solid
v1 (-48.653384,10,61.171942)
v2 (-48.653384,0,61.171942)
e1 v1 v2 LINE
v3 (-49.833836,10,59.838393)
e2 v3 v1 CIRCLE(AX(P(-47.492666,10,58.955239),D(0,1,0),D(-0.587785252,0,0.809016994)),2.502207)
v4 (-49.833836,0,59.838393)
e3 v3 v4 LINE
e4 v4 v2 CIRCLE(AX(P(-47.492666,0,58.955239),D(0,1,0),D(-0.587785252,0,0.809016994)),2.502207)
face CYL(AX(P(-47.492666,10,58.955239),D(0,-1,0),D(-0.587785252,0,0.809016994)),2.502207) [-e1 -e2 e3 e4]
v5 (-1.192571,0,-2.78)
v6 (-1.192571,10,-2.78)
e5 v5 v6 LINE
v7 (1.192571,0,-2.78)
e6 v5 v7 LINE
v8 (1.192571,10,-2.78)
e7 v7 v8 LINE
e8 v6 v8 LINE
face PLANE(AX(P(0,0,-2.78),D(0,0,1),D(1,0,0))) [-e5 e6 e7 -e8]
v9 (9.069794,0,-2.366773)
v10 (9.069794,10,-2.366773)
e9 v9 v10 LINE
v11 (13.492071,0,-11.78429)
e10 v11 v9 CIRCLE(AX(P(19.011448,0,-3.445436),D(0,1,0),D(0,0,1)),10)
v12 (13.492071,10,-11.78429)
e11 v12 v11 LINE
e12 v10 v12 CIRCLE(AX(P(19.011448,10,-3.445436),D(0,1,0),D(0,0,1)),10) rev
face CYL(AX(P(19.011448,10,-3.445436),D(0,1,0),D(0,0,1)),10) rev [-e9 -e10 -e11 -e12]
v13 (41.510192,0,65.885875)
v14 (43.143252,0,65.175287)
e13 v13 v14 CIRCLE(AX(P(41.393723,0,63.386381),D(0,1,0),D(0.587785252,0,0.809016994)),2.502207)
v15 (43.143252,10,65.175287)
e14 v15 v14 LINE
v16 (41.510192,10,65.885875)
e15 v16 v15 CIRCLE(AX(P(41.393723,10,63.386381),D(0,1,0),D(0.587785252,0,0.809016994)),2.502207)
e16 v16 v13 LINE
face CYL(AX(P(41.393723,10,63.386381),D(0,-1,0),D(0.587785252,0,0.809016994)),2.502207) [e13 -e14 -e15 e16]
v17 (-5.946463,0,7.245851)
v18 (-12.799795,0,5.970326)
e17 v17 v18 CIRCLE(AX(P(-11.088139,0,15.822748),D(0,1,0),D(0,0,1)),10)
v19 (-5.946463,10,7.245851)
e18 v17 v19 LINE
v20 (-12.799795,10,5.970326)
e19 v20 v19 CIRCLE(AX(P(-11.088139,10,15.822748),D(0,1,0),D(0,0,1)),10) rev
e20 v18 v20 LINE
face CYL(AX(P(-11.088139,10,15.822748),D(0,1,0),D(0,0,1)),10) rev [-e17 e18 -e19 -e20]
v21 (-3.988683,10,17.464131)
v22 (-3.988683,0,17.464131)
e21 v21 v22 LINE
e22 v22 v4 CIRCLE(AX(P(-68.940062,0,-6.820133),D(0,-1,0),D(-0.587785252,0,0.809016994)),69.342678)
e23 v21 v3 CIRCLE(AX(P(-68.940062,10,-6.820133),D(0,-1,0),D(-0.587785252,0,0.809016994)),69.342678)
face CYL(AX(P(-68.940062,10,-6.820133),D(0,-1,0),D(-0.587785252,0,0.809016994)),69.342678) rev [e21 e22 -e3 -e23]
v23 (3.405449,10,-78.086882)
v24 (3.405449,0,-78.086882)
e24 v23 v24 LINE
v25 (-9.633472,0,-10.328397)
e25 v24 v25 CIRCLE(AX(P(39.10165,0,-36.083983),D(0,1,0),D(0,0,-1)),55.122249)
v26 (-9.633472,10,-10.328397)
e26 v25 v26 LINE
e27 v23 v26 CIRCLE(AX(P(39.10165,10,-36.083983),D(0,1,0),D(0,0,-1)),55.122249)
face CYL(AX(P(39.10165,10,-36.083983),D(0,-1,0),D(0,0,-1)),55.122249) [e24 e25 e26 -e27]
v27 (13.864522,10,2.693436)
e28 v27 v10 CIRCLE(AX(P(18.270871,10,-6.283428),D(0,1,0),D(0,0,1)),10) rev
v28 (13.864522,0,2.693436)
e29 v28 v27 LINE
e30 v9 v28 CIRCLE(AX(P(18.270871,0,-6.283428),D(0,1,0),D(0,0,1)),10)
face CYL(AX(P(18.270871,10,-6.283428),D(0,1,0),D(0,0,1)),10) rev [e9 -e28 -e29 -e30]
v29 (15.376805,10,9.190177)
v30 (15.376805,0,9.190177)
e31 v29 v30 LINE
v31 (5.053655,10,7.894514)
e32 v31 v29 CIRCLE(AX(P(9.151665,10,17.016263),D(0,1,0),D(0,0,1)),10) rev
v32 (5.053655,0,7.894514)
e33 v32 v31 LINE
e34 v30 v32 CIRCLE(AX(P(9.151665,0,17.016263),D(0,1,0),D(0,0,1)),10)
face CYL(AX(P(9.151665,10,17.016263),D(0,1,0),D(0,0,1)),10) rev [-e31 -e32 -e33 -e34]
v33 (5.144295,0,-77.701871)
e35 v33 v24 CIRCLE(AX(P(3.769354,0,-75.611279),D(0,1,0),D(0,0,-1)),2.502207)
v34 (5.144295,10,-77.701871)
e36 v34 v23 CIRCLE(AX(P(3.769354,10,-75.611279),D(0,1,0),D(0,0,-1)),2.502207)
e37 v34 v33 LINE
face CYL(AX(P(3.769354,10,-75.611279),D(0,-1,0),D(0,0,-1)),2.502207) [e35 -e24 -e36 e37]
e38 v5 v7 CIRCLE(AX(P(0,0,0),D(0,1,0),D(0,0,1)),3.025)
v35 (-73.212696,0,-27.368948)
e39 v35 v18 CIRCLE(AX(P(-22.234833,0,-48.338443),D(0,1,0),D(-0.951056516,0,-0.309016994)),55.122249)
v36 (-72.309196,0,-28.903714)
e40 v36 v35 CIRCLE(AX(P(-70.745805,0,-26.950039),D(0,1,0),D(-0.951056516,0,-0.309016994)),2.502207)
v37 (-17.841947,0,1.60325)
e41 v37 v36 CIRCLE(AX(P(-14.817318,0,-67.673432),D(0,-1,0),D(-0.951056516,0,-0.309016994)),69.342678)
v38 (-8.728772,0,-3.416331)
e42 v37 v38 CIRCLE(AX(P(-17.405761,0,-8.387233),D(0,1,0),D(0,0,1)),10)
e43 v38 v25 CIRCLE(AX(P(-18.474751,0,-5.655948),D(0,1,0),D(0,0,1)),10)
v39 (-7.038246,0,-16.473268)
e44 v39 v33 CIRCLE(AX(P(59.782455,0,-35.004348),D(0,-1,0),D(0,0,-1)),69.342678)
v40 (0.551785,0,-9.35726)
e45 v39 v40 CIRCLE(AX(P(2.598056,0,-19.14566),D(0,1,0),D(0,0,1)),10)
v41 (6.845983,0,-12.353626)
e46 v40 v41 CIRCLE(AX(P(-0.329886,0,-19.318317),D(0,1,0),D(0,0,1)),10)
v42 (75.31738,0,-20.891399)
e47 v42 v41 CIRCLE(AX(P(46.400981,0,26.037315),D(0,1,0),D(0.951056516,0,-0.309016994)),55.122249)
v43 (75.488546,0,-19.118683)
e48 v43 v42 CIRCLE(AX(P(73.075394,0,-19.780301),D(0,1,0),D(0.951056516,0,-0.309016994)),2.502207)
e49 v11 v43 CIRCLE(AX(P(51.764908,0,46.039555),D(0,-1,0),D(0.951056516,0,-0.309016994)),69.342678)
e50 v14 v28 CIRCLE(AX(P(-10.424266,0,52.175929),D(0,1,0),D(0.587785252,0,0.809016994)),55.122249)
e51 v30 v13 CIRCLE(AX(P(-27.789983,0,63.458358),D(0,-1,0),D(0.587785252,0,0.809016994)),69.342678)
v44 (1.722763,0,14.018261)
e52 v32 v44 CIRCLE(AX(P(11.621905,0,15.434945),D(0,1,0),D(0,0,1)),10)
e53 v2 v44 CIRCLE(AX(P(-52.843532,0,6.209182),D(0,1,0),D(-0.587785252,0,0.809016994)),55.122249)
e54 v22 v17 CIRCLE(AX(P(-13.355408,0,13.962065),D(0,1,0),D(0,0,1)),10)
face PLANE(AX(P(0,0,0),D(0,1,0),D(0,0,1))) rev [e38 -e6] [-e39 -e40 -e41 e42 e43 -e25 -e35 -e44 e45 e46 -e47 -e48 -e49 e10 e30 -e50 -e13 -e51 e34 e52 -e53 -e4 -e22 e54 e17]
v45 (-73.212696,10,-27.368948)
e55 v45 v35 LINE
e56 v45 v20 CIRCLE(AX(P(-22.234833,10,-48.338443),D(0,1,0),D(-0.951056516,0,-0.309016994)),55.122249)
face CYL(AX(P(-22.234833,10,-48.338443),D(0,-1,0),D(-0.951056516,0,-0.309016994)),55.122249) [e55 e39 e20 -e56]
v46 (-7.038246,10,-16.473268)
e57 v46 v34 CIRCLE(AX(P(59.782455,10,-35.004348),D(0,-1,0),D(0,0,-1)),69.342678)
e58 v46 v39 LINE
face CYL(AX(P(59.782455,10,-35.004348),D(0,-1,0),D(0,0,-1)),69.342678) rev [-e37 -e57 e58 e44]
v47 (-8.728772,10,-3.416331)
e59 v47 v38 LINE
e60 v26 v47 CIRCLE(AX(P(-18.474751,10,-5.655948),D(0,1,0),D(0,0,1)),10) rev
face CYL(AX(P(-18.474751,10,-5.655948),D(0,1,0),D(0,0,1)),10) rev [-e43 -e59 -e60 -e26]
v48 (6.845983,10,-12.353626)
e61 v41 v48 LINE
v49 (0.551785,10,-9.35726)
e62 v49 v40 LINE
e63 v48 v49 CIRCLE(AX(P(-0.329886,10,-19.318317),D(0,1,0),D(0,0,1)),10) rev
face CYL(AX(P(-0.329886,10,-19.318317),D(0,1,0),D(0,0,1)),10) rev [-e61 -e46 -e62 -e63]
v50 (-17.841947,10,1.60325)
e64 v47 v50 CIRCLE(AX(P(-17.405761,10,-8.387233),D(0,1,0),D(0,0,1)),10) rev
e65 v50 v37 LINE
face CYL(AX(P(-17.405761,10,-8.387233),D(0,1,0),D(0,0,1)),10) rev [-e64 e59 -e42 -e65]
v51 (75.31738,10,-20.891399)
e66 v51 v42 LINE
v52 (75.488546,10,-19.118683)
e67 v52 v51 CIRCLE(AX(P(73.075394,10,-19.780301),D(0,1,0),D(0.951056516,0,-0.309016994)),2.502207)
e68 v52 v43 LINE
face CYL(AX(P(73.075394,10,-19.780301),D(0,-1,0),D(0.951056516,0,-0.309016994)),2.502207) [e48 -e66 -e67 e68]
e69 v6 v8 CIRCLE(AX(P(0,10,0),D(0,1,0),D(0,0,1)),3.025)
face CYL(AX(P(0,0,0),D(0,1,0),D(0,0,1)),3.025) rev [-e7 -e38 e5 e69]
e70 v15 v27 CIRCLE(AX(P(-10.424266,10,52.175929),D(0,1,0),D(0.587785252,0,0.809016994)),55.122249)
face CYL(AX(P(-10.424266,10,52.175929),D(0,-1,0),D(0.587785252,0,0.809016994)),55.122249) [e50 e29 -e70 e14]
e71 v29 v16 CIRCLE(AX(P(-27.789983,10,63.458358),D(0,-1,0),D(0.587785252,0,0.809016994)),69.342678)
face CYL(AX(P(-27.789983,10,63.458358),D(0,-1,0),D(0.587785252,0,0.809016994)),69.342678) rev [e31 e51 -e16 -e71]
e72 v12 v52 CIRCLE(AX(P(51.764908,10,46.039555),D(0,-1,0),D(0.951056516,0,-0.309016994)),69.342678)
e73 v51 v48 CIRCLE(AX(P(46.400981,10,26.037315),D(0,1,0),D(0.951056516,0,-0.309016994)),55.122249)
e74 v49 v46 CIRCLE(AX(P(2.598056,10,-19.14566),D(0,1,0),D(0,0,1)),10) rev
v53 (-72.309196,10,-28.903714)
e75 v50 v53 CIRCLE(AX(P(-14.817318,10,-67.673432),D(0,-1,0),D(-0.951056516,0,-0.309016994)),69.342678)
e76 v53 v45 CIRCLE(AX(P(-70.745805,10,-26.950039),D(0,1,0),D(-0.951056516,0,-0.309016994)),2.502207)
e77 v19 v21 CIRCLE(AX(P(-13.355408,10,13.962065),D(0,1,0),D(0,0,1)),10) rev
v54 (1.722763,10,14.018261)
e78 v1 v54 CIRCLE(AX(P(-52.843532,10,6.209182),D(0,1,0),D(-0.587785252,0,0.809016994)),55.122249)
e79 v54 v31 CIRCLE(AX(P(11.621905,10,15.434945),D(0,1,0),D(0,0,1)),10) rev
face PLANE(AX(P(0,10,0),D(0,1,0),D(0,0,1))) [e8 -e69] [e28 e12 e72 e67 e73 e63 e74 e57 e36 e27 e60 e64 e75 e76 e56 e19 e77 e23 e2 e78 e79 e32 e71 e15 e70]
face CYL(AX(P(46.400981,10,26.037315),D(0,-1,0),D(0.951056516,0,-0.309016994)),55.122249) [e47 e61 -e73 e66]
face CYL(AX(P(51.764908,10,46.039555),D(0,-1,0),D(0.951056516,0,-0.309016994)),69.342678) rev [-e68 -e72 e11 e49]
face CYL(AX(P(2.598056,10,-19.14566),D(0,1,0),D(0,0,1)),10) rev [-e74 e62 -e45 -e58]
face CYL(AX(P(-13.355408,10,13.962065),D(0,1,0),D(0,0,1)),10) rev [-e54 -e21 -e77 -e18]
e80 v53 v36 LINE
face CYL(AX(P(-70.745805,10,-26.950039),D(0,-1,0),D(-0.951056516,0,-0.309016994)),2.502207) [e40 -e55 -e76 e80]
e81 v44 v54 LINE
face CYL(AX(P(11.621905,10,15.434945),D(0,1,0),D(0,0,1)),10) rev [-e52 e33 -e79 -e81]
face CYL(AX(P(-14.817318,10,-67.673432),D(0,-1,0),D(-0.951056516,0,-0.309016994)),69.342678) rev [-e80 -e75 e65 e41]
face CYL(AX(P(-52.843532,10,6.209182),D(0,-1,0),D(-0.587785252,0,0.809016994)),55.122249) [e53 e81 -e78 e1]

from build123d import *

# Parameters (mm, degrees)
BOSS_EXTRUDE4_DEPTH = 10
SKETCH5_R           = 1.6210620194390177
BOSS_EXTRUDE8_DEPTH = 10
CIRPATTERN4_COUNT   = 5
SKETCH6_R           = 9.321133181207394
BOSS_EXTRUDE9_DEPTH = 10
CUT_EXTRUDE1_DEPTH  = 10
FILLET1_R           = 10


with BuildPart() as part:
    # Sketch3 → Boss-Extrude4 (new body)
    with BuildSketch(Plane(origin=(0, 0, 0), x_dir=(1, 0, 0), z_dir=(0, 1, 0))):
        with BuildLine():
            ThreePointArc((-2.568584889231257, 0), (-15.859987880186992, 40.28882096120527), (3.4054490784254314, 78.086882111293))
            ThreePointArc((3.4054490784254314, 78.086882111293), (4.310285634950187, 78.05431633363062), (5.144295315107662, 77.70187119279029))
            ThreePointArc((5.144295315107662, 77.70187119279029), (-9.176823691930053, 42.2861657946719), (-2.568584889231257, 4.660405757344381))
            ThreePointArc((-2.568584889231257, 4.660405757344381), (-2.7066052458532077, 2.3302028786721882), (-2.568584889231257, 0))
        make_face()
    extrude(amount=BOSS_EXTRUDE4_DEPTH)


with BuildPart() as body_2:
    # Sketch5 → Boss-Extrude8 (new body)
    with BuildSketch(Plane(origin=(0, 0, 0), x_dir=(1, 0, 0), z_dir=(0, 1, 0))):
        with Locations(Location((0, 0, 0), (0, 0, 270))):
            Circle(SKETCH5_R)
    extrude(amount=BOSS_EXTRUDE8_DEPTH)


with BuildPart() as cirpattern4_1:
    # CirPattern4: pattern copy
    add(part.part.rotate(Axis((-3.4e-16, 0, -5.8e-16), (0, 1, 0)), 1 * 360 / CIRPATTERN4_COUNT))


with BuildPart() as cirpattern4_2:
    # CirPattern4: pattern copy
    add(part.part.rotate(Axis((-3.4e-16, 0, -5.8e-16), (0, 1, 0)), 2 * 360 / CIRPATTERN4_COUNT))


with BuildPart() as cirpattern4_3:
    # CirPattern4: pattern copy
    add(part.part.rotate(Axis((-3.4e-16, 0, -5.8e-16), (0, 1, 0)), 3 * 360 / CIRPATTERN4_COUNT))


with BuildPart() as cirpattern4_4:
    # CirPattern4: pattern copy
    add(part.part.rotate(Axis((-3.4e-16, 0, -5.8e-16), (0, 1, 0)), 4 * 360 / CIRPATTERN4_COUNT))


with BuildPart() as part_1:
    add(part.part)

    add(body_2.part)  # Boss-Extrude9 merges body 2

    add(cirpattern4_1.part)  # Boss-Extrude9 merges CirPattern4_1

    add(cirpattern4_2.part)  # Boss-Extrude9 merges CirPattern4_2

    add(cirpattern4_3.part)  # Boss-Extrude9 merges CirPattern4_3

    add(cirpattern4_4.part)  # Boss-Extrude9 merges CirPattern4_4
    # Sketch6 → Boss-Extrude9 (add)
    with BuildSketch(Plane(origin=(0, 10, 0), x_dir=(1, 0, 0), z_dir=(0, 1, 0))):
        Circle(SKETCH6_R)
    extrude(amount=-BOSS_EXTRUDE9_DEPTH)

    # Sketch7 → Cut-Extrude1 (cut)
    with BuildSketch(Plane(origin=(0, 10, 0), x_dir=(1, 0, 0), z_dir=(0, 1, 0))):
        with BuildLine():
            Line((1.1925707526180573, 2.78), (-1.1925707526180573, 2.78))
            ThreePointArc((-1.1925707526180578, 2.78), (-1.6647970556993392, -2.5256832270367577), (3.025, -7.4e-16))
            ThreePointArc((3.025, 0), (2.5256832270367577, 1.6647970556993388), (1.1925707526180576, 2.78))
        make_face()
    extrude(amount=-CUT_EXTRUDE1_DEPTH, mode=Mode.SUBTRACT)

    # Fillet1
    # the kernel refuses this fillet: 10 mm, written as the material it adds along each edge
    with BuildSketch(Plane(origin=(9.294704214468556, 10, 0.7014252257691618), x_dir=(0.9166930954116449, 0, 0.399592002953784), z_dir=(0, -1, 0))) as fillet1_piece_1:
        with BuildLine():
            CenterArc((5.437298438361188, -9.98977111966082), FILLET1_R, 92.59172373372462, 44.87729573930281)
            ThreePointArc((-1.9318208534579913, -3.2298834828033556), (-0.8012017224871335, -1.713455421939968), (0, 0))
            ThreePointArc((0, 0), (2.4925557778833074, -0.0563838885471548), (4.985111555766614, 2e-17))
        make_face()
    extrude(amount=10)
    with BuildSketch(Plane(origin=(6.60253368503394, 10, -6.579519186065028), x_dir=(0.46308073985482195, 0, 0.8863160995804548), z_dir=(0, -1, 0))) as fillet1_piece_2:
        with BuildLine():
            CenterArc((8.524117810925986, -9.546886996079968), FILLET1_R, 107.3138862206167, 66.77214806671216)
            ThreePointArc((-1.4226595103454045, -8.516537093842318), (-0.8440182810230222, -4.236103365094945), (0, 0))
            ThreePointArc((0, 0), (2.774027598326007, -0.42235266556755513), (5.548055196652016, 2e-17))
        make_face()
    extrude(amount=10)
    with BuildSketch(Plane(origin=(-4.2171994813875955, 10, -8.31256592851991), x_dir=(-0.3267162956046077, 0, -0.9451224588308135), z_dir=(0, -1, 0))) as fillet1_piece_3:
        with BuildLine():
            CenterArc((8.011945209416133, 9.980599667944867), FILLET1_R, 206.79739354469726, 66.7721480667119)
            ThreePointArc((-0.9141180755940358, 5.47223031395517), (-0.04047863659748981, 2.805703542850818), (0, 0))
            ThreePointArc((0, 0), (4.317272407237243, -0.13452709830263468), (8.634544814474475, -3.1e-16))
        make_face()
    extrude(amount=10)
    with BuildSketch(Plane(origin=(3.539316591620801, 10, -8.623036695160394), x_dir=(-0.9827141698360341, 0, -0.18512930725164625), z_dir=(0, -1, 0))) as fillet1_piece_4:
        with BuildLine():
            CenterArc((5.782329586263011, 9.794100565483701), FILLET1_R, 213.47572744282695, 44.87729573930915)
            ThreePointArc((-2.5588660900526423, 4.278263848410483), (-1.2310439268876425, 2.1680738683956533), (0, 0))
            ThreePointArc((0, 0), (1.881759756341037, 0.19192160510617215), (3.7635195126820715, -5e-17))
        make_face()
    extrude(amount=10)
    with BuildSketch(Plane(origin=(-9.208906301869895, 10, 1.4420709085153902), x_dir=(-0.9998257608489958, 0, 0.018666760370418967), z_dir=(0, -1, 0))) as fillet1_piece_5:
        with BuildLine():
            CenterArc((8.011945209416153, 9.980599667944865), FILLET1_R, 206.79739354469731, 66.7721480667119)
            ThreePointArc((-0.9141180755940117, 5.472230313955157), (-0.04047863659747148, 2.8057035428508104), (0, 0))
            ThreePointArc((0, 0), (4.317272407237252, -0.13452709830265147), (8.634544814474507, -2e-17))
        make_face()
    extrude(amount=10)
    with BuildSketch(Plane(origin=(-7.1072862639004715, 10, -6.030754989615849), x_dir=(-0.47974381311129005, 0, 0.8774086127805217), z_dir=(0, -1, 0))) as fillet1_piece_6:
        with BuildLine():
            CenterArc((5.782329586263038, 9.794100565483692), FILLET1_R, 213.47572744282687, 44.877295739309034)
            ThreePointArc((-2.5588660900526223, 4.278263848410486), (-1.2310439268876405, 2.168073868395652), (0, 0))
            ThreePointArc((0, 0), (1.8817597563410384, 0.19192160510617853), (3.763519512682072, -7e-17))
        make_face()
    extrude(amount=10)
    with BuildSketch(Plane(origin=(-7.931861070486542, 10, 4.895825133754791), x_dir=(-0.9764945790844407, 0, 0.21554196115536567), z_dir=(0, -1, 0))) as fillet1_piece_7:
        with BuildLine():
            CenterArc((5.43729843836118, -9.989771119660821), FILLET1_R, 92.59172373372459, 44.877295739302724)
            ThreePointArc((-1.9318208534579884, -3.2298834828033454), (-0.801201722487141, -1.7134554219399574), (0, 0))
            ThreePointArc((0, 0), (2.492555777883305, -0.05638388854715234), (4.985111555766614, 5e-17))
        make_face()
    extrude(amount=10)
    with BuildSketch(Plane(origin=(-1.4742176123811461, 10, 9.203814764169852), x_dir=(-0.8956037205130516, 0, -0.44485275744135816), z_dir=(0, -1, 0))) as fillet1_piece_8:
        with BuildLine():
            CenterArc((8.524117810925947, -9.546886996079973), FILLET1_R, 107.31388622061658, 66.77214806671205)
            ThreePointArc((-1.422659510345439, -8.516537093842285), (-0.8440182810230522, -4.236103365094935), (0, 0))
            ThreePointArc((0, 0), (2.774027598325997, -0.42235266556755147), (5.548055196651995, 2.3e-16))
        make_face()
    extrude(amount=10)
    with BuildSketch(Plane(origin=(2.2051265282976815, 10, 9.056541325252308), x_dir=(-0.0967608331602571, 0, 0.9953076615630632), z_dir=(0, -1, 0))) as fillet1_piece_9:
        with BuildLine():
            CenterArc((5.437298438361169, -9.989771119660823), FILLET1_R, 92.59172373372452, 44.87729573930274)
            ThreePointArc((-1.9318208534579957, -3.229883482803339), (-0.8012017224871391, -1.7134554219399516), (0, 0))
            ThreePointArc((0, 0), (2.4925557778833074, -0.05638388854715363), (4.985111555766614, 3e-17))
        make_face()
    extrude(amount=10)
    with BuildSketch(Plane(origin=(8.297789710604665, 10, 4.2461994418996625), x_dir=(-0.6998368836204316, 0, 0.7143026923681881), z_dir=(0, -1, 0))) as fillet1_piece_10:
        with BuildLine():
            CenterArc((8.52411781092599, -9.546886996079968), FILLET1_R, 107.3138862206167, 66.77214806671219)
            ThreePointArc((-1.4226595103454007, -8.516537093842324), (-0.8440182810230218, -4.236103365094961), (0, 0))
            ThreePointArc((0, 0), (2.774027598326008, -0.4223526655675579), (5.548055196652019, 1.7e-16))
        make_face()
    extrude(amount=10)


solid = part_1.part
